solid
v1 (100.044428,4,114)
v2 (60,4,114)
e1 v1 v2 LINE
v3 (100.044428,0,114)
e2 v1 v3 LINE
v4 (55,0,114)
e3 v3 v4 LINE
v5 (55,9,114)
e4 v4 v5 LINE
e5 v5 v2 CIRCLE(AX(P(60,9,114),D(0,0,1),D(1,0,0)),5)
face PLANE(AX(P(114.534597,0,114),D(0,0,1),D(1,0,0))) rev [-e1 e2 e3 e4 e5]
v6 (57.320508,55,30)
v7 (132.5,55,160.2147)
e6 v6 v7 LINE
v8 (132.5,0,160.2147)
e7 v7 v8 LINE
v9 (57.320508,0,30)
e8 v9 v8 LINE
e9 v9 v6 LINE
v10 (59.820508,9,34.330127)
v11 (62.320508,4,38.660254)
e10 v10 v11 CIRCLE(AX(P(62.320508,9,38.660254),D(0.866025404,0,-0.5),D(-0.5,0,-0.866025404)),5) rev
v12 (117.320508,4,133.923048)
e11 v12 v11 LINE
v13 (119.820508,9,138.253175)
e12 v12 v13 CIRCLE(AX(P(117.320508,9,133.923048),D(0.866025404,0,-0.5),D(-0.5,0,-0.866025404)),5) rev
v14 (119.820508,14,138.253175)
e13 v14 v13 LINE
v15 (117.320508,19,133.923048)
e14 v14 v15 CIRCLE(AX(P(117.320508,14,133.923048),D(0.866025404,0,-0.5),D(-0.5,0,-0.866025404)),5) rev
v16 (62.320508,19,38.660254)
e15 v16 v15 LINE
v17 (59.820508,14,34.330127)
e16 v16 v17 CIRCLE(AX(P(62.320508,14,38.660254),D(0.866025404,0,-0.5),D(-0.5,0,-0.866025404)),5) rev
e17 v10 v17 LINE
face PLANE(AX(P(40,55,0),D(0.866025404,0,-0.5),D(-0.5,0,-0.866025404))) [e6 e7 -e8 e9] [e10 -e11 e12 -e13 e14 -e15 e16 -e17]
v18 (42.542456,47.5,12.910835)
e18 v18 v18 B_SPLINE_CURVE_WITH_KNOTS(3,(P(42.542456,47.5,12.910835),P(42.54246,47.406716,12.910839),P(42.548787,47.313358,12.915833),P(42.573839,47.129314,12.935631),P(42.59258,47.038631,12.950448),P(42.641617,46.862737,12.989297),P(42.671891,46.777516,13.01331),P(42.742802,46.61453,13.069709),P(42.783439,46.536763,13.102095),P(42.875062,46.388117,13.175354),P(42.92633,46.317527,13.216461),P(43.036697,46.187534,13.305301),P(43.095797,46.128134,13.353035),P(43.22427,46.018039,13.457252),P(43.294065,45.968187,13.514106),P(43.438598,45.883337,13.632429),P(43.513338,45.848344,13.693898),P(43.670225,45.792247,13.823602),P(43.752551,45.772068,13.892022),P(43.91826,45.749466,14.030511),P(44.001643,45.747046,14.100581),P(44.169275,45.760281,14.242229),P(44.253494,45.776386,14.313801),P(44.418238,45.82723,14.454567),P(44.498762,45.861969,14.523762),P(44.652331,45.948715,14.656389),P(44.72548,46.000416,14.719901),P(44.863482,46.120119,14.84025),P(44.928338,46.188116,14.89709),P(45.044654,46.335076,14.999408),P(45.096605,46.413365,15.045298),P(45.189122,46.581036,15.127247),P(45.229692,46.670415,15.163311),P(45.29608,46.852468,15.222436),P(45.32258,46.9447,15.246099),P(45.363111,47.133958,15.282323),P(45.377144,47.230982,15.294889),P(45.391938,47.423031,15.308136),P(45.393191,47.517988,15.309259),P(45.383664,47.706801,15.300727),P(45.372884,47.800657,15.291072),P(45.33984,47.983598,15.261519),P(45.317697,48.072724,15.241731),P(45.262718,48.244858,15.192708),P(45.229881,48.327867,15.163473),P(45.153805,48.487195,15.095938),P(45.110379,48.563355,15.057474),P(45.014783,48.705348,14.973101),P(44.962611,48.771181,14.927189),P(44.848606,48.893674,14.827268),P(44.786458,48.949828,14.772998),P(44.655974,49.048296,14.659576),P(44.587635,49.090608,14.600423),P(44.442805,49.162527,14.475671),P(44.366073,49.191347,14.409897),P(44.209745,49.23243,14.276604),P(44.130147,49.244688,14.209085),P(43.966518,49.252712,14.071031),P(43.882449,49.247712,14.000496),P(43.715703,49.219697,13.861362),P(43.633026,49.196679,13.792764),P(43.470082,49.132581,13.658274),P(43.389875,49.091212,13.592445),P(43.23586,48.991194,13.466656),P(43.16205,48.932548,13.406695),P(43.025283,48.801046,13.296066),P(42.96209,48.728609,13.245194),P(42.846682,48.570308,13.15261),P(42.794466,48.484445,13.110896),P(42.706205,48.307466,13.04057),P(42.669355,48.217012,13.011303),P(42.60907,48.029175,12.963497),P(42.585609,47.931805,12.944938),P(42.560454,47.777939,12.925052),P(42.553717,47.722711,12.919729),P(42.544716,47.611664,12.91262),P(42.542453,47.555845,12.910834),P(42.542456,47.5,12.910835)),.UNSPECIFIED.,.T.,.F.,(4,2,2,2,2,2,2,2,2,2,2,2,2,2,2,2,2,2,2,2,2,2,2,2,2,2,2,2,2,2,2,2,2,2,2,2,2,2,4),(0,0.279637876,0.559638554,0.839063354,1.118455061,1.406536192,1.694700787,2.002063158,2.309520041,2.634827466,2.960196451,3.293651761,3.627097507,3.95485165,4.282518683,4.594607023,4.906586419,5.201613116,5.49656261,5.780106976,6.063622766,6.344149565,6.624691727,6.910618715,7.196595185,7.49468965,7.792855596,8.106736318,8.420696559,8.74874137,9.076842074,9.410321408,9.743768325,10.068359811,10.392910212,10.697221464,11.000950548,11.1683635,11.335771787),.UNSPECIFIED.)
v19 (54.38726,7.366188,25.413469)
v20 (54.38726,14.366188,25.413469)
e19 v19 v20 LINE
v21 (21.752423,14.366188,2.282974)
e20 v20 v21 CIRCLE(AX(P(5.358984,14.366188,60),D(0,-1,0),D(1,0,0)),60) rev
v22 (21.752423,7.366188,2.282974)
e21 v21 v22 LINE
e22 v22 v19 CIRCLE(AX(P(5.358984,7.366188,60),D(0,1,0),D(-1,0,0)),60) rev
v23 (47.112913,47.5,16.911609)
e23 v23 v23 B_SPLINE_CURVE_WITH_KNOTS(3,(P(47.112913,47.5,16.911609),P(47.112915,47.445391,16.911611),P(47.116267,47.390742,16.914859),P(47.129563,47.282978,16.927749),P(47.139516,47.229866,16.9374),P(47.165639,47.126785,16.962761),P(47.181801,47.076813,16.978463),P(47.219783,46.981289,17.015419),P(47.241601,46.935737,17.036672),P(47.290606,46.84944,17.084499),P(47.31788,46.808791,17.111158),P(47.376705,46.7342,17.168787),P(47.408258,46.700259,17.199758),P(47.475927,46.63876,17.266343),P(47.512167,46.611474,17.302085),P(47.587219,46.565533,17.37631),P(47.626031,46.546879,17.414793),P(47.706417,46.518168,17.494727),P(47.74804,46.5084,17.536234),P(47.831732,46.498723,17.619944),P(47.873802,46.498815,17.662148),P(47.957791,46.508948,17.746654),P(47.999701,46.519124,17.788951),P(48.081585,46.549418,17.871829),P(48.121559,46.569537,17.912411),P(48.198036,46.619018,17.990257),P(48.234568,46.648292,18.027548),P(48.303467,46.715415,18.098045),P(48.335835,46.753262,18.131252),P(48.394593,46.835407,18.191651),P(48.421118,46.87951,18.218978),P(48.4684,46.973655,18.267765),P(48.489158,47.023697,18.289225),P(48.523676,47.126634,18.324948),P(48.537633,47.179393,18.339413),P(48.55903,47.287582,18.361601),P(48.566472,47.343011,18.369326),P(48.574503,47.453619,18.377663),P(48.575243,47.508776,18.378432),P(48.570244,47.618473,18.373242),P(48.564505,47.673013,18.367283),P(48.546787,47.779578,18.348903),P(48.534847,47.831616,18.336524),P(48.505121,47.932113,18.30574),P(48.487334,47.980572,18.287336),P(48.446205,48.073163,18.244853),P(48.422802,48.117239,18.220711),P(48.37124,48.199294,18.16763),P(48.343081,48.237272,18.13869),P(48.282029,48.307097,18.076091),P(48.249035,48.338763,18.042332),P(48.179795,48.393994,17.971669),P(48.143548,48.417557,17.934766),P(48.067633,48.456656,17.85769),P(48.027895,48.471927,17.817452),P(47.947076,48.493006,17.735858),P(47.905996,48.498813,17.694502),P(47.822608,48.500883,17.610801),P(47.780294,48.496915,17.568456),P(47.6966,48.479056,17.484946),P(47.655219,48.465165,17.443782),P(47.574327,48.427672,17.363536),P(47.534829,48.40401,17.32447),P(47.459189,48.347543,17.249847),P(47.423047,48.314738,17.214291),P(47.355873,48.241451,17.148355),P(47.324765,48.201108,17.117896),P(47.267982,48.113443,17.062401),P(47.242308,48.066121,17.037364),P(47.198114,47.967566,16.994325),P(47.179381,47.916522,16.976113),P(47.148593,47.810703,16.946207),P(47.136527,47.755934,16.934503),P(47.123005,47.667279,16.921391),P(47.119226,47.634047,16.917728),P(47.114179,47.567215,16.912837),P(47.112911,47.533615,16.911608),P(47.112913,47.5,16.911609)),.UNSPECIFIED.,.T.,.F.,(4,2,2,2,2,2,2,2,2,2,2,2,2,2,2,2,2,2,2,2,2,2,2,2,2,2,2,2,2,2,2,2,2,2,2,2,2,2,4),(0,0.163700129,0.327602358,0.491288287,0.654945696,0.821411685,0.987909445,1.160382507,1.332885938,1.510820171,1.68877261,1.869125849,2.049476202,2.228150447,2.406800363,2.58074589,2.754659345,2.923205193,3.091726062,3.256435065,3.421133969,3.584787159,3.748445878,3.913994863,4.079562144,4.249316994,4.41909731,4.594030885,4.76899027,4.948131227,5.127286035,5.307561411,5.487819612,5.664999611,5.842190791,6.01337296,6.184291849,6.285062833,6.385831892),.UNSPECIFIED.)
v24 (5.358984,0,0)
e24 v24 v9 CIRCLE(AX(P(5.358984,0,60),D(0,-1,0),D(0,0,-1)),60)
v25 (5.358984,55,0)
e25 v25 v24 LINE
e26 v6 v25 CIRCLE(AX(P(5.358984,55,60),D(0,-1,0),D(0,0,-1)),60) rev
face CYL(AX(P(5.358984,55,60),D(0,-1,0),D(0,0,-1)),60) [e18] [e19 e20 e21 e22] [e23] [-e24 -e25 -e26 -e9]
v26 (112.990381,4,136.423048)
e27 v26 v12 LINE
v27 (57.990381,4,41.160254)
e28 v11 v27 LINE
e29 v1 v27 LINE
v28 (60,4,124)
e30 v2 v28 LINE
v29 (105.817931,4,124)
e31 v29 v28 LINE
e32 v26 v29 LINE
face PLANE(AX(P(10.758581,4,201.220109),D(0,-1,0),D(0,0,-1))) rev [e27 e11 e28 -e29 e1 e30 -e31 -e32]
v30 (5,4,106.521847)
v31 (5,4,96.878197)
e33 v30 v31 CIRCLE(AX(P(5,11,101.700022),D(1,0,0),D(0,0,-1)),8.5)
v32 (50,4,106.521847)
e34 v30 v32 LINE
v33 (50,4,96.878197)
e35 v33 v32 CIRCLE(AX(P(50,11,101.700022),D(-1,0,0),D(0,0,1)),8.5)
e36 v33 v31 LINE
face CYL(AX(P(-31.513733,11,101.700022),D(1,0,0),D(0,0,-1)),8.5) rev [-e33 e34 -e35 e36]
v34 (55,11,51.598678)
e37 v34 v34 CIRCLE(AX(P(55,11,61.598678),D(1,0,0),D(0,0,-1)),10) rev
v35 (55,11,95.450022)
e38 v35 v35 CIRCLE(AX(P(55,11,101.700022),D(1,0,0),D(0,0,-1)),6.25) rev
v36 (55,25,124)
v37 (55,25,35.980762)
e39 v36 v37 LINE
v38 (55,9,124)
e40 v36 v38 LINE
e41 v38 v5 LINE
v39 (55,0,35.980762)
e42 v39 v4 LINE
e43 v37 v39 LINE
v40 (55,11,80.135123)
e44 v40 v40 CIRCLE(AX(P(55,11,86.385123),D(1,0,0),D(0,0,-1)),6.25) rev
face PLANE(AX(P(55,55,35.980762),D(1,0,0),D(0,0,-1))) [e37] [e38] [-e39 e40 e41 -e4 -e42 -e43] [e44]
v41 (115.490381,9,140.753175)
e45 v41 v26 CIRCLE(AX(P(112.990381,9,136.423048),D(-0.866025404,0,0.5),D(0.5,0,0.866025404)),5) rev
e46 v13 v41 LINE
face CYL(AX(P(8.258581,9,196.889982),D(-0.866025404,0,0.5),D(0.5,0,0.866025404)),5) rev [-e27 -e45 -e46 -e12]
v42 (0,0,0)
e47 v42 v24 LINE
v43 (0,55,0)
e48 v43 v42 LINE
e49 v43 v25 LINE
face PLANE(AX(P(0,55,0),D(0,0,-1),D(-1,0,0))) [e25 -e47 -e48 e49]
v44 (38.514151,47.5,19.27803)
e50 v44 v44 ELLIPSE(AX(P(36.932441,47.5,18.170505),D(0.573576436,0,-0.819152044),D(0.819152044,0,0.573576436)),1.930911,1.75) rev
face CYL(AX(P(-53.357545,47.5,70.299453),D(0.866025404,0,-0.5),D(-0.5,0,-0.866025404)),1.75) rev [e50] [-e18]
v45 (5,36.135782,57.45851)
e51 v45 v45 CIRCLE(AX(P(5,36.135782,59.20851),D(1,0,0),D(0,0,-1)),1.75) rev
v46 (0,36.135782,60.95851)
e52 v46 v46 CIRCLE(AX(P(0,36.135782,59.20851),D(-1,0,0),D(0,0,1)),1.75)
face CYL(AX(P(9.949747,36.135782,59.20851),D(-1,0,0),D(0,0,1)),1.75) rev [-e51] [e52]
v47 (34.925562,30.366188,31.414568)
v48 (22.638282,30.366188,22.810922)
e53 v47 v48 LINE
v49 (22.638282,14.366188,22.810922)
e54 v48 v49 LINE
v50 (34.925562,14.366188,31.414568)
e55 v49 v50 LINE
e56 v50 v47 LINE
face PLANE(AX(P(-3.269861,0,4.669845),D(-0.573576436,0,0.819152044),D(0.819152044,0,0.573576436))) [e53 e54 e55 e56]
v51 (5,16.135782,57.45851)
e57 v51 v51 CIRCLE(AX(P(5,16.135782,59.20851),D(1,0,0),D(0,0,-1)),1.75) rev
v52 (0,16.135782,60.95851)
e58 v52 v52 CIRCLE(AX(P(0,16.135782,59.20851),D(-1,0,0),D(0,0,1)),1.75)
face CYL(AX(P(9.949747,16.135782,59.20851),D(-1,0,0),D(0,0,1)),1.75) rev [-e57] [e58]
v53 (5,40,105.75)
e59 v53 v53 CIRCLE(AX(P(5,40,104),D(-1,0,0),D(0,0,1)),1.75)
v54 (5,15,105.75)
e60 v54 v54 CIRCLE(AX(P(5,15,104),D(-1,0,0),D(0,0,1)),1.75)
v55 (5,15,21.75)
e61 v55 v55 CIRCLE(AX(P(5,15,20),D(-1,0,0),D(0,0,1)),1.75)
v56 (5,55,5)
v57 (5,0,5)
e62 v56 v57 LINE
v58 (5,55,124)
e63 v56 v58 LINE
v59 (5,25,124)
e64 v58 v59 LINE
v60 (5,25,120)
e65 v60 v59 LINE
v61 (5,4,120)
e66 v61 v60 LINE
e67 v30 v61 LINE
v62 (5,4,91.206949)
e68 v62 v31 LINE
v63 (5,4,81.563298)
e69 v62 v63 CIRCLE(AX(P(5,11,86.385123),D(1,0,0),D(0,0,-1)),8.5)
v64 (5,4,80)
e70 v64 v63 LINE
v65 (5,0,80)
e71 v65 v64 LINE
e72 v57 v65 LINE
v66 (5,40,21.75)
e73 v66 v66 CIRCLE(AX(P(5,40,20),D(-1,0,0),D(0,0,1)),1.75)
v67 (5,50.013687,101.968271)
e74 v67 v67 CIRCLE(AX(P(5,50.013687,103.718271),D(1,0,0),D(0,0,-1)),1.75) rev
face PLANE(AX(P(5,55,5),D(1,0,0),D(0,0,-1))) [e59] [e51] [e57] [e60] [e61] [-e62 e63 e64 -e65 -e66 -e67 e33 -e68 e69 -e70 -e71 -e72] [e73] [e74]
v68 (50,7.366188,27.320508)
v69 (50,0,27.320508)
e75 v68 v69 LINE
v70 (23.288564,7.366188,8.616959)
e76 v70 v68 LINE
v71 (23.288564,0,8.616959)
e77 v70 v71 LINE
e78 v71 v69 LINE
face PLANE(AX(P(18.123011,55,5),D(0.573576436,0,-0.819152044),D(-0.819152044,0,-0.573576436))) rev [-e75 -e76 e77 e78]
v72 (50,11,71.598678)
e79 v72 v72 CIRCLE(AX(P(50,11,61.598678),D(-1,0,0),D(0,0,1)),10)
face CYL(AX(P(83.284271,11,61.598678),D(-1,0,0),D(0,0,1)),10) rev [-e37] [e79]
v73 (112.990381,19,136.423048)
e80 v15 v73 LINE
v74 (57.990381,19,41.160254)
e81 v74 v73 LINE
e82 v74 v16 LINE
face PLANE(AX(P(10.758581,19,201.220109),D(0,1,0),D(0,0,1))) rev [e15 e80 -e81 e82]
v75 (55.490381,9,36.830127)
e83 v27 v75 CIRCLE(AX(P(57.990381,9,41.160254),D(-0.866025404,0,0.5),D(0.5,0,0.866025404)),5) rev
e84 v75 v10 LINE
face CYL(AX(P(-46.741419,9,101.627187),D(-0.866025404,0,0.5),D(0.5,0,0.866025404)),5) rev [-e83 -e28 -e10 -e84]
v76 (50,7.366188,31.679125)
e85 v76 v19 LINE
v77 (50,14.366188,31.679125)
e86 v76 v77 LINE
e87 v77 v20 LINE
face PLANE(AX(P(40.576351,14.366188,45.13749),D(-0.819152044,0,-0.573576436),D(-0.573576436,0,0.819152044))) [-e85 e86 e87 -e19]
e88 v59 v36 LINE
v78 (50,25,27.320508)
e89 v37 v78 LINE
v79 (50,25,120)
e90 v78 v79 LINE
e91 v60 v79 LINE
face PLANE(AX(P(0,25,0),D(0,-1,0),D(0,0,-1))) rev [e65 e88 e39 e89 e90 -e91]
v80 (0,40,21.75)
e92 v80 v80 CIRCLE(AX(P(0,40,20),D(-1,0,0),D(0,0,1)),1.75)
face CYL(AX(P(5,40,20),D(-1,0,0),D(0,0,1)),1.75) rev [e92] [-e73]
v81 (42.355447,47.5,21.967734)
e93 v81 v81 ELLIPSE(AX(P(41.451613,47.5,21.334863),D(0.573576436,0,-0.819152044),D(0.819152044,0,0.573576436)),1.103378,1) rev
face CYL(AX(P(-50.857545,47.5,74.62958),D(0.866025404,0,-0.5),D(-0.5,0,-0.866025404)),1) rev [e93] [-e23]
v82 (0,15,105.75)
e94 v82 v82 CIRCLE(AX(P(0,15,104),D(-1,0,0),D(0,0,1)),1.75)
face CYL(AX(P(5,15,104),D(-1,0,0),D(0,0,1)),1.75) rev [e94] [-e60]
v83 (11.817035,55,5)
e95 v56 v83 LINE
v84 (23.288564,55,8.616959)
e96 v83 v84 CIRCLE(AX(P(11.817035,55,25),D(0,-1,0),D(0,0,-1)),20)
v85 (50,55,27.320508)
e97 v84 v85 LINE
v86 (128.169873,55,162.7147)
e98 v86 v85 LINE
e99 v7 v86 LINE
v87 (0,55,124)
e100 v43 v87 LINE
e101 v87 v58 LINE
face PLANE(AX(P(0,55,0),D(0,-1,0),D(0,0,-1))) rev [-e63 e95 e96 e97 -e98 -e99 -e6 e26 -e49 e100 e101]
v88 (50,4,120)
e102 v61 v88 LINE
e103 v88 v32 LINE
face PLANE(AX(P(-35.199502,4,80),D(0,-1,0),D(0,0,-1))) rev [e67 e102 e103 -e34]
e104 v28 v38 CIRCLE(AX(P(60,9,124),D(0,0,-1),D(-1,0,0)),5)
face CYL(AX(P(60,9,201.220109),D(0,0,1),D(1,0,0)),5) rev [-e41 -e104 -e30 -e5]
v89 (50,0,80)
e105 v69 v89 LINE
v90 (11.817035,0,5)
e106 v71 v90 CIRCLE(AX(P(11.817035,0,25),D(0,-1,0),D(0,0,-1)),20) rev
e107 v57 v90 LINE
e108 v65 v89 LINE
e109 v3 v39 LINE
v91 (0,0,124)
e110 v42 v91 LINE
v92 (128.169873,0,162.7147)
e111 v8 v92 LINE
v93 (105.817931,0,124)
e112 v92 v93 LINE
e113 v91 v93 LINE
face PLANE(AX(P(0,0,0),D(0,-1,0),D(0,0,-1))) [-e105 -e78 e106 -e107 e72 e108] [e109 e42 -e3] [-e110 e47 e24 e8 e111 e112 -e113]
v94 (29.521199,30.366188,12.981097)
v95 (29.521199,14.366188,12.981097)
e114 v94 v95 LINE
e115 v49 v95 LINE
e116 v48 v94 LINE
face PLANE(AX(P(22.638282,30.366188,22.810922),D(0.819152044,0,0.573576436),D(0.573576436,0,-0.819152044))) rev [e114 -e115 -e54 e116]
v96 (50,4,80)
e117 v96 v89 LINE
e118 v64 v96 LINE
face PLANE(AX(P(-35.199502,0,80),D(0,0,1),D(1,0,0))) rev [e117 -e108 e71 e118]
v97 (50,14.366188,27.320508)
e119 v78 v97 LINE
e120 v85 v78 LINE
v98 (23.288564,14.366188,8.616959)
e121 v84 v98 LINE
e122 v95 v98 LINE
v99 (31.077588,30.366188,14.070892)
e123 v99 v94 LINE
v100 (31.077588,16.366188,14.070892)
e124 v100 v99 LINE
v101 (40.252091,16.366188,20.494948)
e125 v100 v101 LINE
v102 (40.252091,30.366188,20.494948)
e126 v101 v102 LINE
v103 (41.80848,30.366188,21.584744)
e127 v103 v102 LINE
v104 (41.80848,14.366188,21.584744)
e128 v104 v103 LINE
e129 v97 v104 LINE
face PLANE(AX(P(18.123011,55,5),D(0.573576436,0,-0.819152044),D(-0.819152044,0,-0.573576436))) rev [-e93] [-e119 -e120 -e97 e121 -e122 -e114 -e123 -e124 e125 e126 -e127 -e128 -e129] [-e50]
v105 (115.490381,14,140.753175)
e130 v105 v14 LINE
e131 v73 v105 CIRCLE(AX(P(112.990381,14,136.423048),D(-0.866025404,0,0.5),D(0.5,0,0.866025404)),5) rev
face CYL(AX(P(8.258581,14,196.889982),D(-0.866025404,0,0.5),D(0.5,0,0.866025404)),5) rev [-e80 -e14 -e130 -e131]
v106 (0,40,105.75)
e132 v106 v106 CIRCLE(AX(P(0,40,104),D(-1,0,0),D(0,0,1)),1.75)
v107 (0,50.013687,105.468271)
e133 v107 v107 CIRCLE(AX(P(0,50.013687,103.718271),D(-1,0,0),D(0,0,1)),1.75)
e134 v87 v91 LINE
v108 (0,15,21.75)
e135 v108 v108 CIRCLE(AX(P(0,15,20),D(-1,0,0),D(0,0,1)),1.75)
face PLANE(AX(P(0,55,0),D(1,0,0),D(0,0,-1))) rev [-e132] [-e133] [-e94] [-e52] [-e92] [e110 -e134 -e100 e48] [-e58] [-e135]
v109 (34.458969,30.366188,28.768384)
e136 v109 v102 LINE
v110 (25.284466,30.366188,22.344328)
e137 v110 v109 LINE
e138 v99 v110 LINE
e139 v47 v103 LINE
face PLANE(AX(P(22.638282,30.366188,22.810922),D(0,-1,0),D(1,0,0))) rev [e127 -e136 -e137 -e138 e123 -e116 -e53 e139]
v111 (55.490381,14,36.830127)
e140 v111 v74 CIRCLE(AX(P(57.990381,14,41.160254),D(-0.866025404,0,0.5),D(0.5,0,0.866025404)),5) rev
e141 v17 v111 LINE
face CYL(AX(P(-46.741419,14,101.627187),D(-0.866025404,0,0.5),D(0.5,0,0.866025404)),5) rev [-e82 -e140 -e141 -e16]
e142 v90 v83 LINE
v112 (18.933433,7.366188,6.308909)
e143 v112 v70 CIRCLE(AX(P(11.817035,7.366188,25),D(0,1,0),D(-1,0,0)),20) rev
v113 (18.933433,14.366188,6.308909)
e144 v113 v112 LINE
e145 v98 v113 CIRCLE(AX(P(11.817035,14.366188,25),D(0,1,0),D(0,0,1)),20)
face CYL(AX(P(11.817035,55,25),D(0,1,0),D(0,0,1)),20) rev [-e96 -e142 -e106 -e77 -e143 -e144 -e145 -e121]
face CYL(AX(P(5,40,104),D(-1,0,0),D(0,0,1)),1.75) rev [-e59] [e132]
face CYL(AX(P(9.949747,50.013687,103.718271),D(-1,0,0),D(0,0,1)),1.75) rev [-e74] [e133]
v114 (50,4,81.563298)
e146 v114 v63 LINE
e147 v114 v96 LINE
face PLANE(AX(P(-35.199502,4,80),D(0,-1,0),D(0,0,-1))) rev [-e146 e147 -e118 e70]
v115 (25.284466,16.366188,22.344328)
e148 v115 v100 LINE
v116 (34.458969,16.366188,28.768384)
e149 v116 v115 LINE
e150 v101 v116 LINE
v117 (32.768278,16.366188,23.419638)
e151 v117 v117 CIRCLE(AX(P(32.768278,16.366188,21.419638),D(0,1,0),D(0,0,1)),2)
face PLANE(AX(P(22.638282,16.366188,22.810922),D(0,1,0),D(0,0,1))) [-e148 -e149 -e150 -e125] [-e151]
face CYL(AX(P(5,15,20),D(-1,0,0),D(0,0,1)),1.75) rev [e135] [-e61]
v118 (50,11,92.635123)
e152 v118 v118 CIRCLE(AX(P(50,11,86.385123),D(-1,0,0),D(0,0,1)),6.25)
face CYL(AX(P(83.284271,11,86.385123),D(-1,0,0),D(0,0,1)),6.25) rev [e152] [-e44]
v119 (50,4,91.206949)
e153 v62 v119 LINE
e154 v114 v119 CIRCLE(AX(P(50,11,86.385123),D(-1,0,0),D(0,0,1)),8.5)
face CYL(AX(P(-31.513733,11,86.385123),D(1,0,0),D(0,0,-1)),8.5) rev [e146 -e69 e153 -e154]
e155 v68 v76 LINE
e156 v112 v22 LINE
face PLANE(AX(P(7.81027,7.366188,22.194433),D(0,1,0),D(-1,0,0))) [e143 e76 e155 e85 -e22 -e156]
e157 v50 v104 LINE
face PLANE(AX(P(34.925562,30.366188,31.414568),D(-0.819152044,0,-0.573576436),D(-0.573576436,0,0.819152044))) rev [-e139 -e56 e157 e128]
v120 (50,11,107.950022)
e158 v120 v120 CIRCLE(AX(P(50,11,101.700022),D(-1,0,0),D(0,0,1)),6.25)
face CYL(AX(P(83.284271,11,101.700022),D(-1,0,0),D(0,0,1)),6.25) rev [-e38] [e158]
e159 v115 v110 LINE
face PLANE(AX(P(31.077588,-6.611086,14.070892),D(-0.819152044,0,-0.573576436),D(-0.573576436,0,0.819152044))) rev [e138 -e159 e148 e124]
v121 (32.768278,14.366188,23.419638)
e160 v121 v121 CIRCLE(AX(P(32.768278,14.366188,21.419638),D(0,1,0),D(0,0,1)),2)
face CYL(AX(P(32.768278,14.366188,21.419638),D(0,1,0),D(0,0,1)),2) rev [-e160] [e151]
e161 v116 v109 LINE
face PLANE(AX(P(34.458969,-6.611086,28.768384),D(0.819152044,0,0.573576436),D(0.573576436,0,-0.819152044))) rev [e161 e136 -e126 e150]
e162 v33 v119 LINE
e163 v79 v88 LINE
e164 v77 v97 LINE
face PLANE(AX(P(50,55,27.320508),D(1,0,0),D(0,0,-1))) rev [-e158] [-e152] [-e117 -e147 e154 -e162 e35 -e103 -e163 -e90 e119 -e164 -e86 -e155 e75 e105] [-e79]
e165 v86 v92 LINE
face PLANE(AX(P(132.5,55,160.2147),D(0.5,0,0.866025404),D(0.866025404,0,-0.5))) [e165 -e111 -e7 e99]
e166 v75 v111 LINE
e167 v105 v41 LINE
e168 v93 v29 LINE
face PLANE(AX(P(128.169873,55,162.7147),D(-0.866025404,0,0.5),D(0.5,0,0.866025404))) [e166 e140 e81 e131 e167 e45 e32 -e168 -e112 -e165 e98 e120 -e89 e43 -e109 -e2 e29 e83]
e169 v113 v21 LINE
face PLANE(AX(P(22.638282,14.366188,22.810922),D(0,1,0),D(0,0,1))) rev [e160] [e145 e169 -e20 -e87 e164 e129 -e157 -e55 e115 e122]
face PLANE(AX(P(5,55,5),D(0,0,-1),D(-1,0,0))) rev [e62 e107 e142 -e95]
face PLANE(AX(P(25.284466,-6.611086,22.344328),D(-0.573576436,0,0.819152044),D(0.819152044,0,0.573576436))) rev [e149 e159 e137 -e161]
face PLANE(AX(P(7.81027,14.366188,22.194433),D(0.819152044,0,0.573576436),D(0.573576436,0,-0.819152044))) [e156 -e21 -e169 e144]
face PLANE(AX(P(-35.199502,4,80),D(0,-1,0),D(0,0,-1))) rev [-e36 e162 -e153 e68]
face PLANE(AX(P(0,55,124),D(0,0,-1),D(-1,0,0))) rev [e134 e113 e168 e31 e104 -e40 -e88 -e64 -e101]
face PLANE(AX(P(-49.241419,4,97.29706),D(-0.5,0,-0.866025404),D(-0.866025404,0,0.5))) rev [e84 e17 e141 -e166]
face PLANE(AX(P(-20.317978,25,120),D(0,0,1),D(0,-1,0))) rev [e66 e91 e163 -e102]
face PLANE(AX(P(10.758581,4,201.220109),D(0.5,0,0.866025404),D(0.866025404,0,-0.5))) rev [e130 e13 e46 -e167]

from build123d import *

# Parameters (mm, degrees)
BOSS_EXTRUDE3_DEPTH     = 55
FILLET1_R               = 60
SKETCH4_W               = 15
SKETCH4_H               = 16
BOSS_EXTRUDE4_DEPTH     = 12
CUT_EXTRUDE1_DEPTH      = 20
CUT_EXTRUDE1_DEPTH_BACK = 14
SKETCH5_W               = 40
SKETCH5_H               = 7
CUT_EXTRUDE2_DEPTH      = 14
SKETCH7_R               = 2
CUT_EXTRUDE3_DEPTH      = 2
CUT_EXTRUDE4_DEPTH      = 30
SKETCH9_R               = 10
SKETCH9_R_2             = 6.25
CUT_EXTRUDE5_DEPTH      = 5
SKETCH10_W              = 120
SKETCH10_H              = 15
CUT_EXTRUDE6_DEPTH      = 5
SKETCH11_W              = 4
SKETCH11_H              = 25
BOSS_EXTRUDE5_DEPTH     = 45
FILLET3_R               = 20
BOSS_EXTRUDE6_REACH     = 190.434
SKETCH12_W              = 10
SKETCH12_H              = 4
SKETCH13_W              = 40
SKETCH13_H              = 4
BOSS_EXTRUDE7_DEPTH     = 45
FILLET4_R               = 5
FILLET5_R               = 5
CUT_EXTRUDE7_DEPTH      = 45
SKETCH16_R              = 1.75
CUT_EXTRUDE8_DEPTH      = 5
SKETCH15_R              = 1.75
CUT_EXTRUDE9_DEPTH      = 5
CUT_EXTRUDE10_REACH     = 216.345
SKETCH17_R              = 1.75
SKETCH17_R_2            = 1


with BuildPart() as part:
    # Sketch3 → Boss-Extrude3 (new body)
    with BuildSketch(Plane(origin=(0, 0, 0), x_dir=(1, 0, 0), z_dir=(0, 1, 0))):
        Polygon((128.169872981, -162.7146997), (55, -35.980762114), (55, -124), (50, -124), (50, -27.320508076), (18.123010882, -5), (5, -5), (5, -124), (0, -124), (0, 0), (40, 0), (132.5, -160.2146997), align=None)
    extrude(amount=BOSS_EXTRUDE3_DEPTH)

    # Fillet1
    fillet1_edges = [part.edges().sort_by_distance(p)[0] for p in [
        (40, 27.5, 0),
    ]]
    fillet(fillet1_edges, radius=FILLET1_R)

    # Sketch4 → Boss-Extrude4 (add)
    with BuildSketch(Plane(origin=(3.613056499, 0, -5.159979438), x_dir=(0.8191520442889911, 0, 0.5735764363510469), z_dir=(-0.5735764363510469, 0, 0.8191520442889911))):
        with Locations((39.128001876, 22.366188336)):
            Rectangle(SKETCH4_W, SKETCH4_H)
    extrude(amount=BOSS_EXTRUDE4_DEPTH)

    # Sketch5 → Cut-Extrude1 (cut, two sides: drawn at the far end of the back side and taken through both)
    with BuildSketch(Plane(origin=(3.613056499, 0, -5.159979438), x_dir=(0.8191520442889911, 0, 0.5735764363510469), z_dir=(-0.5735764363510469, 0, 0.8191520442889911)).offset(-CUT_EXTRUDE1_DEPTH_BACK)):
        with Locations((39.128001876, 10.866188336)):
            Rectangle(SKETCH5_W, SKETCH5_H)
    extrude(amount=CUT_EXTRUDE1_DEPTH + CUT_EXTRUDE1_DEPTH_BACK, mode=Mode.SUBTRACT)

    # Sketch6 → Cut-Extrude2 (cut)
    with BuildSketch(Plane(origin=(0, 30.366188336, 0), x_dir=(1, 0, 0), z_dir=(0, 1, 0))):
        Polygon((31.077587777, -14.070892396), (25.28446577, -22.344328043), (34.458968666, -28.76838413), (40.252090673, -20.494948483), align=None)
    extrude(amount=-CUT_EXTRUDE2_DEPTH, mode=Mode.SUBTRACT)

    # Sketch7 → Cut-Extrude3 (cut)
    with BuildSketch(Plane(origin=(0, 16.366188336, 0), x_dir=(1, 0, 0), z_dir=(0, 1, 0))):
        with Locations(Location((32.768278221, -21.419638263, 0), (0, 0, 270))):
            Circle(SKETCH7_R)
    extrude(amount=-CUT_EXTRUDE3_DEPTH, mode=Mode.SUBTRACT)

    # Sketch8 → Cut-Extrude4 (cut)
    with BuildSketch(Plane(origin=(0, 55, 0), x_dir=(1, 0, 0), z_dir=(0, 1, 0))):
        Polygon((55, -35.980762114), (50, -27.320508076), (50, -124), (55, -124), align=None)
    extrude(amount=-CUT_EXTRUDE4_DEPTH, mode=Mode.SUBTRACT)

    # Sketch9 → Cut-Extrude5 (cut)
    with BuildSketch(Plane.ZY.offset(-50)):
        with Locations((61.598678321, 11)):
            Circle(SKETCH9_R)
        with Locations((86.385123427, 11)):
            Circle(SKETCH9_R_2)
        with Locations((101.700022006, 11)):
            Circle(SKETCH9_R_2)
    extrude(amount=-CUT_EXTRUDE5_DEPTH, mode=Mode.SUBTRACT)

    # Sketch10 → Cut-Extrude6 (cut)
    with BuildSketch(Plane(origin=(30, 0, -17.320508076), x_dir=(-0.5000000000000047, 0, -0.866025403784436), z_dir=(0.866025403784436, 0, -0.5000000000000047))):
        with Locations((-119.641016151, 11.5)):
            Rectangle(SKETCH10_W, SKETCH10_H)
    extrude(amount=-CUT_EXTRUDE6_DEPTH, mode=Mode.SUBTRACT)

    # Sketch11 → Boss-Extrude5 (add)
    with BuildSketch(Plane.ZY.offset(-50)):
        with Locations((122, 12.5)):
            Rectangle(SKETCH11_W, SKETCH11_H)
    extrude(amount=BOSS_EXTRUDE5_DEPTH)

    # Fillet3
    # the kernel refuses this fillet: 20 mm, written as the material it adds along each edge
    with BuildSketch(Plane(origin=(18.123010882, 0, 5), x_dir=(-1, 0, 0), z_dir=(0, 1, 0))) as fillet3_piece_1_section:
        with BuildLine():
            CenterArc((FILLET3_R * 0.315298788879, FILLET3_R), FILLET3_R, 235, 35)
            Line((-FILLET3_R * 0.258277647472, FILLET3_R * 0.180847955711), (0, 0))
            Line((0, 0), (FILLET3_R * 0.315298788879, 0))
        make_face()
    fillet3_piece_1 = extrude(amount=55, mode=Mode.PRIVATE)
    fillet3_piece_1 = split(fillet3_piece_1, bisect_by=Plane(origin=(18.647698148, 3.683094168, 6.716980636), z_dir=(-0.8191520442889912, 0, -0.5735764363510469)), keep=Keep.TOP, mode=Mode.PRIVATE)
    fillet3_piece_1 = split(fillet3_piece_1, bisect_by=Plane(origin=(16.403340896, 7.366188336, 5.14546477), z_dir=(0, -1, 0)), keep=Keep.TOP, mode=Mode.PRIVATE)
    add(fillet3_piece_1)
    with BuildSketch(Plane(origin=(18.123010882, 0, 5), x_dir=(-1, 0, 0), z_dir=(0, 1, 0))) as fillet3_piece_2_section:
        with BuildLine():
            CenterArc((FILLET3_R * 0.315298788879, FILLET3_R), FILLET3_R, 235, 35)
            Line((-FILLET3_R * 0.258277647472, FILLET3_R * 0.180847955711), (0, 0))
            Line((0, 0), (FILLET3_R * 0.315298788879, 0))
        make_face()
    fillet3_piece_2 = extrude(amount=55, mode=Mode.PRIVATE)
    fillet3_piece_2 = split(fillet3_piece_2, bisect_by=Plane(origin=(19.32323837, 3.683094168, 5.752209215), z_dir=(0.8191520442889912, 0, 0.5735764363510469)), keep=Keep.TOP, mode=Mode.PRIVATE)
    fillet3_piece_2 = split(fillet3_piece_2, bisect_by=Plane(origin=(20.990357579, 7.366188336, 6.919538653), z_dir=(0, -1, 0)), keep=Keep.TOP, mode=Mode.PRIVATE)
    add(fillet3_piece_2)
    with BuildSketch(Plane(origin=(18.123010882, 0, 5), x_dir=(-1, 0, 0), z_dir=(0, 1, 0))) as fillet3_piece_3_section:
        with BuildLine():
            CenterArc((FILLET3_R * 0.315298788879, FILLET3_R), FILLET3_R, 235, 35)
            Line((-FILLET3_R * 0.258277647472, FILLET3_R * 0.180847955711), (0, 0))
            Line((0, 0), (FILLET3_R * 0.315298788879, 0))
        make_face()
    fillet3_piece_3 = extrude(amount=55, mode=Mode.PRIVATE)
    fillet3_piece_3 = split(fillet3_piece_3, bisect_by=Plane(origin=(16.403340896, 14.366188336, 5.14546477), z_dir=(0, -1, 0)), keep=Keep.TOP, mode=Mode.PRIVATE)
    fillet3_piece_3 = split(fillet3_piece_3, bisect_by=Plane(origin=(18.647698148, 10.866188336, 6.716980636), z_dir=(-0.8191520442889912, 0, -0.5735764363510469)), keep=Keep.TOP, mode=Mode.PRIVATE)
    fillet3_piece_3 = split(fillet3_piece_3, bisect_by=Plane(origin=(16.403340896, 7.366188336, 5.14546477), z_dir=(0, 1, 0)), keep=Keep.TOP, mode=Mode.PRIVATE)
    add(fillet3_piece_3)
    with BuildSketch(Plane(origin=(18.123010882, 0, 5), x_dir=(-1, 0, 0), z_dir=(0, 1, 0))) as fillet3_piece_4_section:
        with BuildLine():
            CenterArc((FILLET3_R * 0.315298788879, FILLET3_R), FILLET3_R, 235, 35)
            Line((-FILLET3_R * 0.258277647472, FILLET3_R * 0.180847955711), (0, 0))
            Line((0, 0), (FILLET3_R * 0.315298788879, 0))
        make_face()
    fillet3_piece_4 = extrude(amount=55, mode=Mode.PRIVATE)
    fillet3_piece_4 = split(fillet3_piece_4, bisect_by=Plane(origin=(16.403340896, 14.366188336, 5.14546477), z_dir=(0, 1, 0)), keep=Keep.TOP, mode=Mode.PRIVATE)
    fillet3_piece_4 = split(fillet3_piece_4, bisect_by=Plane(origin=(18.647698148, 34.683094168, 6.716980636), z_dir=(-0.8191520442889912, 0, -0.5735764363510469)), keep=Keep.TOP, mode=Mode.PRIVATE)
    add(fillet3_piece_4)
    with BuildSketch(Plane(origin=(18.123010882, 0, 5), x_dir=(-1, 0, 0), z_dir=(0, 1, 0))) as fillet3_piece_5_section:
        with BuildLine():
            CenterArc((FILLET3_R * 0.315298788879, FILLET3_R), FILLET3_R, 235, 35)
            Line((-FILLET3_R * 0.258277647472, FILLET3_R * 0.180847955711), (0, 0))
            Line((0, 0), (FILLET3_R * 0.315298788879, 0))
        make_face()
    fillet3_piece_5 = extrude(amount=55, mode=Mode.PRIVATE)
    fillet3_piece_5 = split(fillet3_piece_5, bisect_by=Plane(origin=(20.990357579, 14.366188336, 6.919538653), z_dir=(0, 1, 0)), keep=Keep.TOP, mode=Mode.PRIVATE)
    fillet3_piece_5 = split(fillet3_piece_5, bisect_by=Plane(origin=(19.32323837, 34.683094168, 5.752209215), z_dir=(0.8191520442889912, 0, 0.5735764363510469)), keep=Keep.TOP, mode=Mode.PRIVATE)
    add(fillet3_piece_5)

    # Boss-Extrude6: up to this plane
    boss_extrude6_end = Plane(origin=(128.169872981, 55, 162.7146997), z_dir=(-0.8660254037844362, 0, 0.5000000000000044))
    # Sketch12 → Boss-Extrude6 (add, up to the surface)
    with BuildSketch(Plane(origin=(55, 0, 0), x_dir=(0, 0, -1), z_dir=(1, 0, 0)), mode=Mode.PRIVATE) as boss_extrude6_sk1:
        with Locations((-119, 2)):
            Rectangle(SKETCH12_W, SKETCH12_H)
    boss_extrude6_tool1 = split(extrude(boss_extrude6_sk1.sketch, amount=BOSS_EXTRUDE6_REACH, mode=Mode.PRIVATE), bisect_by=boss_extrude6_end, keep=Keep.BOTH, mode=Mode.PRIVATE)
    add(boss_extrude6_tool1.solids().sort_by_distance((55, 2, 119))[0])

    # Sketch13 → Boss-Extrude7 (add)
    with BuildSketch(Plane.ZY.offset(-50)):
        with Locations((100, 2)):
            Rectangle(SKETCH13_W, SKETCH13_H)
    extrude(amount=BOSS_EXTRUDE7_DEPTH)

    # Fillet4
    fillet4_edges = [part.edges().sort_by_distance(p)[0] for p in [
        (57.655444566, 4, 35.580127019),
        (57.655444566, 19, 35.580127019),
        (117.655444566, 19, 139.503175473),
        (117.655444566, 4, 139.503175473),
    ]]
    fillet(fillet4_edges, radius=FILLET4_R)

    # Fillet5
    fillet5_edges = [part.edges().sort_by_distance(p)[0] for p in [
        (55, 4, 119),
    ]]
    fillet(fillet5_edges, radius=FILLET5_R)

    # Sketch14 → Cut-Extrude7 (cut)
    with BuildSketch(Plane.ZY.offset(-50)):
        with BuildLine():
            ThreePointArc((94.042572717, 14.689643665), (77.885123427, 11), (94.042572717, 7.310356335))
            ThreePointArc((94.042572717, 7.310356335), (110.200022006, 11), (94.042572717, 14.689643665))
        make_face()
    extrude(amount=CUT_EXTRUDE7_DEPTH, mode=Mode.SUBTRACT)

    # Sketch16 → Cut-Extrude8 (cut)
    with BuildSketch(Plane.ZY):
        with Locations((59.208509529, 36.135781847)):
            Circle(SKETCH16_R)
        with Locations((59.208509529, 16.135781847)):
            Circle(SKETCH16_R)
        with Locations((103.718271361, 50.013687011)):
            Circle(SKETCH16_R)
    extrude(amount=-CUT_EXTRUDE8_DEPTH, mode=Mode.SUBTRACT)

    # Sketch15 → Cut-Extrude9 (cut)
    with BuildSketch(Plane.ZY):
        with Locations((104, 40)):
            Circle(SKETCH15_R)
        with Locations((104, 15)):
            Circle(SKETCH15_R)
        with Locations((20, 15)):
            Circle(SKETCH15_R)
        with Locations((20, 40)):
            Circle(SKETCH15_R)
    extrude(amount=-CUT_EXTRUDE9_DEPTH, mode=Mode.SUBTRACT)

    # Cut-Extrude10: up to this plane
    cut_extrude10_end = Plane(origin=(18.123010882, 55, 5), z_dir=(0.5735764363510469, 0, -0.8191520442889914))
    # Sketch17 → Cut-Extrude10 (cut, up to the surface)
    with BuildSketch(Plane(origin=(30, 0, -17.320508076), x_dir=(-0.5000000000000047, 0, -0.866025403784436), z_dir=(0.866025403784436, 0, -0.5000000000000047)), mode=Mode.PRIVATE) as cut_extrude10_sk1:
        with Locations((-34.202339372, 47.5)):
            Circle(SKETCH17_R)
    cut_extrude10_tool1 = split(extrude(cut_extrude10_sk1.sketch, amount=-CUT_EXTRUDE10_REACH, mode=Mode.PRIVATE), bisect_by=cut_extrude10_end, keep=Keep.BOTH, mode=Mode.PRIVATE)
    add(cut_extrude10_tool1.solids().sort_by_distance((47.10117, 47.5, 12.299587))[0], mode=Mode.SUBTRACT)
    # Sketch17 → Cut-Extrude10 (cut, up to the surface)
    with BuildSketch(Plane(origin=(30, 0, -17.320508076), x_dir=(-0.5000000000000047, 0, -0.866025403784436), z_dir=(0.866025403784436, 0, -0.5000000000000047)), mode=Mode.PRIVATE) as cut_extrude10_sk2:
        with Locations((-39.202339372, 47.5)):
            Circle(SKETCH17_R_2)
    cut_extrude10_tool2 = split(extrude(cut_extrude10_sk2.sketch, amount=-CUT_EXTRUDE10_REACH, mode=Mode.PRIVATE), bisect_by=cut_extrude10_end, keep=Keep.BOTH, mode=Mode.PRIVATE)
    add(cut_extrude10_tool2.solids().sort_by_distance((49.60117, 47.5, 16.629714))[0], mode=Mode.SUBTRACT)


solid = part.part
